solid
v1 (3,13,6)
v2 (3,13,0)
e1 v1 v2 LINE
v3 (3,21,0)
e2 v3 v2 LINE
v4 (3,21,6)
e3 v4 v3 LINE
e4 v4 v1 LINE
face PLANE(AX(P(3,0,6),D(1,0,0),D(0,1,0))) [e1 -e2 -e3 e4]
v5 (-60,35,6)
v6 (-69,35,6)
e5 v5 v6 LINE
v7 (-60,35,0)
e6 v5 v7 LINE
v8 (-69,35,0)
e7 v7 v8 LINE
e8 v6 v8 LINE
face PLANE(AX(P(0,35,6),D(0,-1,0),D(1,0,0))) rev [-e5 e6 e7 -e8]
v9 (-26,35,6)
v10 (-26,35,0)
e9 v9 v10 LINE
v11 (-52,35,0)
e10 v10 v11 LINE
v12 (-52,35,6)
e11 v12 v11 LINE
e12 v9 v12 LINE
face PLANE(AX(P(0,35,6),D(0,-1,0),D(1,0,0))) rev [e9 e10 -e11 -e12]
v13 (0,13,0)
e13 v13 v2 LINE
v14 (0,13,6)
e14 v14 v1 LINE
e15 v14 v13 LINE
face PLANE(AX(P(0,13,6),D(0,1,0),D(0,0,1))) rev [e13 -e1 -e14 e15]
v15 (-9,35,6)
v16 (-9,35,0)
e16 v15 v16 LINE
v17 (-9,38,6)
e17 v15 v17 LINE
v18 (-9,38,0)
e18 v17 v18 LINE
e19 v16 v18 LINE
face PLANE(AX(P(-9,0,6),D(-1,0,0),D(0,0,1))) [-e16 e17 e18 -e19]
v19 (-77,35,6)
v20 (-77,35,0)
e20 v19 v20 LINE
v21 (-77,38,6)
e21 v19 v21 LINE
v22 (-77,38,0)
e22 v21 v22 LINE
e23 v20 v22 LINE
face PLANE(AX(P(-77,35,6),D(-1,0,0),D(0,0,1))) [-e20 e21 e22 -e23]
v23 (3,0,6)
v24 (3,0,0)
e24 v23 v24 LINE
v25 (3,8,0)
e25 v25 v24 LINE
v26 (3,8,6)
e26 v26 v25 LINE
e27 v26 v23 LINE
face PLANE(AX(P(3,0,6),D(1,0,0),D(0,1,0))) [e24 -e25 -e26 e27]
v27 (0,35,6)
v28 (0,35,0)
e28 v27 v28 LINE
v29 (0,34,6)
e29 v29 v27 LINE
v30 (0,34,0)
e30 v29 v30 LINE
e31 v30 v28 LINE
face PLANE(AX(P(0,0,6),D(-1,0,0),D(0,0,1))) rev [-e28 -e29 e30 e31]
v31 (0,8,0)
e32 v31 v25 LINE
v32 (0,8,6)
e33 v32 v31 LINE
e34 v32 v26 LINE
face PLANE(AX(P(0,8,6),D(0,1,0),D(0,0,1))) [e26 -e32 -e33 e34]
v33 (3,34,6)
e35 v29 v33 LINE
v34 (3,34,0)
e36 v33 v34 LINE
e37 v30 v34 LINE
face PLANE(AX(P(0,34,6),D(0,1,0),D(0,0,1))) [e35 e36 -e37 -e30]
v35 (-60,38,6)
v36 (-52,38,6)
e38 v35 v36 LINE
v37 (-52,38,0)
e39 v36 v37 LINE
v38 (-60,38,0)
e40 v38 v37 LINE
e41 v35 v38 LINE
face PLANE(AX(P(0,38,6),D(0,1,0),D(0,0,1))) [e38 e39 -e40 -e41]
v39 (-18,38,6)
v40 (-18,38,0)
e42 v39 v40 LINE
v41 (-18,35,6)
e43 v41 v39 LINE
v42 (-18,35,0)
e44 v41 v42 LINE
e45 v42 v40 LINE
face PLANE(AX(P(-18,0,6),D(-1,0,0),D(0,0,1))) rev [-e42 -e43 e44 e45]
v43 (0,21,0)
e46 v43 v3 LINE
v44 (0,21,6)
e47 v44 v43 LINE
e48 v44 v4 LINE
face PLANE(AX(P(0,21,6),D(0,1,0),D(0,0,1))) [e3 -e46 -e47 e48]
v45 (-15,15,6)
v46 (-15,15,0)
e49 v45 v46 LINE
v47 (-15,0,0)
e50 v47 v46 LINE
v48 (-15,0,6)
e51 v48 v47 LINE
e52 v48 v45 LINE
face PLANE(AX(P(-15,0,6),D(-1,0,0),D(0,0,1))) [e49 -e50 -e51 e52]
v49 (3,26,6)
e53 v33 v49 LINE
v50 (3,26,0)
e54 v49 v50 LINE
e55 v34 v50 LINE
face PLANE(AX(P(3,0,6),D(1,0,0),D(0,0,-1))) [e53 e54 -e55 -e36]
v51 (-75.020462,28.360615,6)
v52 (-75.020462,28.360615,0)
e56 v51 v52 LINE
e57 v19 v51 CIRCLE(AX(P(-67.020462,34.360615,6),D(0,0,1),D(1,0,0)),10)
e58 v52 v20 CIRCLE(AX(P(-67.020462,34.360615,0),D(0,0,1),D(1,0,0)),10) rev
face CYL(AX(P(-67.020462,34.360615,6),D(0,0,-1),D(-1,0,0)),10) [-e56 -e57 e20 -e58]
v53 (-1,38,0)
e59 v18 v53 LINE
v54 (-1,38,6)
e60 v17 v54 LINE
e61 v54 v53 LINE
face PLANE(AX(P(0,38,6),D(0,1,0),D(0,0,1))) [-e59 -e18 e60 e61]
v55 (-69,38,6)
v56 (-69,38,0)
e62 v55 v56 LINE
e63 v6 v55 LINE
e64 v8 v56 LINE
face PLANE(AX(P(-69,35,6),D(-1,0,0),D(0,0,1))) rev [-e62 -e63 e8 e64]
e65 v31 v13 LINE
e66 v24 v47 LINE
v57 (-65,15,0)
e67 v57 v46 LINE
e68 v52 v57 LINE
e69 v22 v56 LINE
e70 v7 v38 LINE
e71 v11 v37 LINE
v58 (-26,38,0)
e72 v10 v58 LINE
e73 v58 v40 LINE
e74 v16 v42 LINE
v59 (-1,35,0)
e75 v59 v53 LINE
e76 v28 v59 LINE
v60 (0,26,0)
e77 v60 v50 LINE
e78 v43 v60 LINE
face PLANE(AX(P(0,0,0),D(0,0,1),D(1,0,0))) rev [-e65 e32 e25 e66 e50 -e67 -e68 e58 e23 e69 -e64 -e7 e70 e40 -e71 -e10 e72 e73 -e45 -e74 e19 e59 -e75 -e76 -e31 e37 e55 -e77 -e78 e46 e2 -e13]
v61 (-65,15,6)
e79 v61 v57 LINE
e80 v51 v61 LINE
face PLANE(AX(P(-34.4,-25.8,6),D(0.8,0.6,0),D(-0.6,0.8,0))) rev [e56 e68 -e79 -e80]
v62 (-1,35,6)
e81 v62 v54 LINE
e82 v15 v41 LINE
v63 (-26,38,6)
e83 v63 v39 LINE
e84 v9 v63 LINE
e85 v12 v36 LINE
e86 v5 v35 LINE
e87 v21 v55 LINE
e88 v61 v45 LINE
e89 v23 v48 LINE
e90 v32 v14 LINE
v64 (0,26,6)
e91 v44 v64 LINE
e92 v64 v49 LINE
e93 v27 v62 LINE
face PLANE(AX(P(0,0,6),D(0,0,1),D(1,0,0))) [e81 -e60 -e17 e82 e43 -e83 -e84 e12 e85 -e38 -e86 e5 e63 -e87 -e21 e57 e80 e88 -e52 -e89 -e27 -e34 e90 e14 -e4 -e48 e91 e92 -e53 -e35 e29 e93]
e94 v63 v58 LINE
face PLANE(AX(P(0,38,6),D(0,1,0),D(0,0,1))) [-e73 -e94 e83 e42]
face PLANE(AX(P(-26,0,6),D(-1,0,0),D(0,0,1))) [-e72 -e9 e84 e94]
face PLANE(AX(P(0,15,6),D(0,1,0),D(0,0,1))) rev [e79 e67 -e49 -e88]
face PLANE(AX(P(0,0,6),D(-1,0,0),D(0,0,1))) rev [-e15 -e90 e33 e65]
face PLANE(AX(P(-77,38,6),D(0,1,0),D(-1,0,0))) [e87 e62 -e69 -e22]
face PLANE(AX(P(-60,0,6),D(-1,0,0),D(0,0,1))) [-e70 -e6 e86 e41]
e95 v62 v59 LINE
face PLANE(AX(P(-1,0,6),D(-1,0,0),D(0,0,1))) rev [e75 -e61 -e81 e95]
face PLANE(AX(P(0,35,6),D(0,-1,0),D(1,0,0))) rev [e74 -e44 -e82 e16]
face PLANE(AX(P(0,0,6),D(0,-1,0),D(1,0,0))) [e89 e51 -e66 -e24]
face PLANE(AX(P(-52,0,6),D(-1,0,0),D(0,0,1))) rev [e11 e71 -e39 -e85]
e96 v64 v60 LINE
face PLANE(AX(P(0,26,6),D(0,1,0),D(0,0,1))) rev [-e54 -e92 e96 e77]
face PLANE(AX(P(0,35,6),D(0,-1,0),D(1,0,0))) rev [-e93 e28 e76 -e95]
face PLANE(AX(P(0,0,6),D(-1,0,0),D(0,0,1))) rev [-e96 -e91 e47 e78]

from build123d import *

# Parameters (mm, degrees)
ESQUISSE1_W             = 8
ESQUISSE1_H             = 3
ESQUISSE1_W_2           = 3
ESQUISSE1_H_2           = 8
BOSS_EXTRU_1_DEPTH      = 6
CONG_1_R                = 10
ESQUISSE2_W             = 8
ESQUISSE2_H             = 6
ENL_V_MAT_EXTRU_1_DEPTH = 3


with BuildPart() as part:
    # Esquisse1 → Boss.-Extru.1 (new body)
    with BuildSketch(Plane.XY):
        Polygon((-60, 35), (-69, 35), (-77, 35), (-80, 35), (-65, 15), (-15, 15), (-15, 0), (0, 0), (0, 8), (0, 13), (0, 21), (0, 26), (0, 34), (0, 35), (-1, 35), (-9, 35), (-18, 35), (-26, 35), (-35, 35), (-43, 35), (-52, 35), align=None)
        with Locations((-56, 36.5)):
            Rectangle(ESQUISSE1_W, ESQUISSE1_H)
        with Locations((-39, 36.5)):
            Rectangle(ESQUISSE1_W, ESQUISSE1_H)
        with Locations((-22, 36.5)):
            Rectangle(ESQUISSE1_W, ESQUISSE1_H)
        with Locations((-5, 36.5)):
            Rectangle(ESQUISSE1_W, ESQUISSE1_H)
        with Locations((1.5, 30)):
            Rectangle(ESQUISSE1_W_2, ESQUISSE1_H_2)
        with Locations((1.5, 17)):
            Rectangle(ESQUISSE1_W_2, ESQUISSE1_H_2)
        with Locations((1.5, 4)):
            Rectangle(ESQUISSE1_W_2, ESQUISSE1_H_2)
        with Locations((-73, 36.5)):
            Rectangle(ESQUISSE1_W, ESQUISSE1_H)
    extrude(amount=BOSS_EXTRU_1_DEPTH)

    # Congé1
    # the kernel refuses this fillet: 10 mm, written as the material it takes off along each edge
    with BuildSketch(Plane(origin=(-80, 35, -20.748076809), x_dir=(1, 0, 0), z_dir=(0, 0, 1))) as cong_1_piece_1:
        with BuildLine():
            CenterArc((12.979538434, -0.639384579), CONG_1_R, 176.334095535, 40.535802111)
            Line((4.979538434, -6.639384579), (4.819538434, -6.759384579))
            Line((4.819538434, -6.759384579), (-0.16, -0.12))
            Line((-0.16, -0.12), (0, 0.2))
            ThreePointArc((0, 0.2), (1.5, 0.2), (2.800409231, 0.012787692))
            Line((2.800409231, 0.012787692), (3, 0))
        make_face()
    extrude(amount=47.496153619, mode=Mode.SUBTRACT)

    # Esquisse2 → Enlèv. mat.-Extru.1 (cut)
    with BuildSketch(Plane(origin=(0, 38, 0), x_dir=(1, 0, 0), z_dir=(0, 1, 0))):
        with Locations((-39, -3)):
            Rectangle(ESQUISSE2_W, ESQUISSE2_H)
    extrude(amount=-ENL_V_MAT_EXTRU_1_DEPTH, mode=Mode.SUBTRACT)


solid = part.part
